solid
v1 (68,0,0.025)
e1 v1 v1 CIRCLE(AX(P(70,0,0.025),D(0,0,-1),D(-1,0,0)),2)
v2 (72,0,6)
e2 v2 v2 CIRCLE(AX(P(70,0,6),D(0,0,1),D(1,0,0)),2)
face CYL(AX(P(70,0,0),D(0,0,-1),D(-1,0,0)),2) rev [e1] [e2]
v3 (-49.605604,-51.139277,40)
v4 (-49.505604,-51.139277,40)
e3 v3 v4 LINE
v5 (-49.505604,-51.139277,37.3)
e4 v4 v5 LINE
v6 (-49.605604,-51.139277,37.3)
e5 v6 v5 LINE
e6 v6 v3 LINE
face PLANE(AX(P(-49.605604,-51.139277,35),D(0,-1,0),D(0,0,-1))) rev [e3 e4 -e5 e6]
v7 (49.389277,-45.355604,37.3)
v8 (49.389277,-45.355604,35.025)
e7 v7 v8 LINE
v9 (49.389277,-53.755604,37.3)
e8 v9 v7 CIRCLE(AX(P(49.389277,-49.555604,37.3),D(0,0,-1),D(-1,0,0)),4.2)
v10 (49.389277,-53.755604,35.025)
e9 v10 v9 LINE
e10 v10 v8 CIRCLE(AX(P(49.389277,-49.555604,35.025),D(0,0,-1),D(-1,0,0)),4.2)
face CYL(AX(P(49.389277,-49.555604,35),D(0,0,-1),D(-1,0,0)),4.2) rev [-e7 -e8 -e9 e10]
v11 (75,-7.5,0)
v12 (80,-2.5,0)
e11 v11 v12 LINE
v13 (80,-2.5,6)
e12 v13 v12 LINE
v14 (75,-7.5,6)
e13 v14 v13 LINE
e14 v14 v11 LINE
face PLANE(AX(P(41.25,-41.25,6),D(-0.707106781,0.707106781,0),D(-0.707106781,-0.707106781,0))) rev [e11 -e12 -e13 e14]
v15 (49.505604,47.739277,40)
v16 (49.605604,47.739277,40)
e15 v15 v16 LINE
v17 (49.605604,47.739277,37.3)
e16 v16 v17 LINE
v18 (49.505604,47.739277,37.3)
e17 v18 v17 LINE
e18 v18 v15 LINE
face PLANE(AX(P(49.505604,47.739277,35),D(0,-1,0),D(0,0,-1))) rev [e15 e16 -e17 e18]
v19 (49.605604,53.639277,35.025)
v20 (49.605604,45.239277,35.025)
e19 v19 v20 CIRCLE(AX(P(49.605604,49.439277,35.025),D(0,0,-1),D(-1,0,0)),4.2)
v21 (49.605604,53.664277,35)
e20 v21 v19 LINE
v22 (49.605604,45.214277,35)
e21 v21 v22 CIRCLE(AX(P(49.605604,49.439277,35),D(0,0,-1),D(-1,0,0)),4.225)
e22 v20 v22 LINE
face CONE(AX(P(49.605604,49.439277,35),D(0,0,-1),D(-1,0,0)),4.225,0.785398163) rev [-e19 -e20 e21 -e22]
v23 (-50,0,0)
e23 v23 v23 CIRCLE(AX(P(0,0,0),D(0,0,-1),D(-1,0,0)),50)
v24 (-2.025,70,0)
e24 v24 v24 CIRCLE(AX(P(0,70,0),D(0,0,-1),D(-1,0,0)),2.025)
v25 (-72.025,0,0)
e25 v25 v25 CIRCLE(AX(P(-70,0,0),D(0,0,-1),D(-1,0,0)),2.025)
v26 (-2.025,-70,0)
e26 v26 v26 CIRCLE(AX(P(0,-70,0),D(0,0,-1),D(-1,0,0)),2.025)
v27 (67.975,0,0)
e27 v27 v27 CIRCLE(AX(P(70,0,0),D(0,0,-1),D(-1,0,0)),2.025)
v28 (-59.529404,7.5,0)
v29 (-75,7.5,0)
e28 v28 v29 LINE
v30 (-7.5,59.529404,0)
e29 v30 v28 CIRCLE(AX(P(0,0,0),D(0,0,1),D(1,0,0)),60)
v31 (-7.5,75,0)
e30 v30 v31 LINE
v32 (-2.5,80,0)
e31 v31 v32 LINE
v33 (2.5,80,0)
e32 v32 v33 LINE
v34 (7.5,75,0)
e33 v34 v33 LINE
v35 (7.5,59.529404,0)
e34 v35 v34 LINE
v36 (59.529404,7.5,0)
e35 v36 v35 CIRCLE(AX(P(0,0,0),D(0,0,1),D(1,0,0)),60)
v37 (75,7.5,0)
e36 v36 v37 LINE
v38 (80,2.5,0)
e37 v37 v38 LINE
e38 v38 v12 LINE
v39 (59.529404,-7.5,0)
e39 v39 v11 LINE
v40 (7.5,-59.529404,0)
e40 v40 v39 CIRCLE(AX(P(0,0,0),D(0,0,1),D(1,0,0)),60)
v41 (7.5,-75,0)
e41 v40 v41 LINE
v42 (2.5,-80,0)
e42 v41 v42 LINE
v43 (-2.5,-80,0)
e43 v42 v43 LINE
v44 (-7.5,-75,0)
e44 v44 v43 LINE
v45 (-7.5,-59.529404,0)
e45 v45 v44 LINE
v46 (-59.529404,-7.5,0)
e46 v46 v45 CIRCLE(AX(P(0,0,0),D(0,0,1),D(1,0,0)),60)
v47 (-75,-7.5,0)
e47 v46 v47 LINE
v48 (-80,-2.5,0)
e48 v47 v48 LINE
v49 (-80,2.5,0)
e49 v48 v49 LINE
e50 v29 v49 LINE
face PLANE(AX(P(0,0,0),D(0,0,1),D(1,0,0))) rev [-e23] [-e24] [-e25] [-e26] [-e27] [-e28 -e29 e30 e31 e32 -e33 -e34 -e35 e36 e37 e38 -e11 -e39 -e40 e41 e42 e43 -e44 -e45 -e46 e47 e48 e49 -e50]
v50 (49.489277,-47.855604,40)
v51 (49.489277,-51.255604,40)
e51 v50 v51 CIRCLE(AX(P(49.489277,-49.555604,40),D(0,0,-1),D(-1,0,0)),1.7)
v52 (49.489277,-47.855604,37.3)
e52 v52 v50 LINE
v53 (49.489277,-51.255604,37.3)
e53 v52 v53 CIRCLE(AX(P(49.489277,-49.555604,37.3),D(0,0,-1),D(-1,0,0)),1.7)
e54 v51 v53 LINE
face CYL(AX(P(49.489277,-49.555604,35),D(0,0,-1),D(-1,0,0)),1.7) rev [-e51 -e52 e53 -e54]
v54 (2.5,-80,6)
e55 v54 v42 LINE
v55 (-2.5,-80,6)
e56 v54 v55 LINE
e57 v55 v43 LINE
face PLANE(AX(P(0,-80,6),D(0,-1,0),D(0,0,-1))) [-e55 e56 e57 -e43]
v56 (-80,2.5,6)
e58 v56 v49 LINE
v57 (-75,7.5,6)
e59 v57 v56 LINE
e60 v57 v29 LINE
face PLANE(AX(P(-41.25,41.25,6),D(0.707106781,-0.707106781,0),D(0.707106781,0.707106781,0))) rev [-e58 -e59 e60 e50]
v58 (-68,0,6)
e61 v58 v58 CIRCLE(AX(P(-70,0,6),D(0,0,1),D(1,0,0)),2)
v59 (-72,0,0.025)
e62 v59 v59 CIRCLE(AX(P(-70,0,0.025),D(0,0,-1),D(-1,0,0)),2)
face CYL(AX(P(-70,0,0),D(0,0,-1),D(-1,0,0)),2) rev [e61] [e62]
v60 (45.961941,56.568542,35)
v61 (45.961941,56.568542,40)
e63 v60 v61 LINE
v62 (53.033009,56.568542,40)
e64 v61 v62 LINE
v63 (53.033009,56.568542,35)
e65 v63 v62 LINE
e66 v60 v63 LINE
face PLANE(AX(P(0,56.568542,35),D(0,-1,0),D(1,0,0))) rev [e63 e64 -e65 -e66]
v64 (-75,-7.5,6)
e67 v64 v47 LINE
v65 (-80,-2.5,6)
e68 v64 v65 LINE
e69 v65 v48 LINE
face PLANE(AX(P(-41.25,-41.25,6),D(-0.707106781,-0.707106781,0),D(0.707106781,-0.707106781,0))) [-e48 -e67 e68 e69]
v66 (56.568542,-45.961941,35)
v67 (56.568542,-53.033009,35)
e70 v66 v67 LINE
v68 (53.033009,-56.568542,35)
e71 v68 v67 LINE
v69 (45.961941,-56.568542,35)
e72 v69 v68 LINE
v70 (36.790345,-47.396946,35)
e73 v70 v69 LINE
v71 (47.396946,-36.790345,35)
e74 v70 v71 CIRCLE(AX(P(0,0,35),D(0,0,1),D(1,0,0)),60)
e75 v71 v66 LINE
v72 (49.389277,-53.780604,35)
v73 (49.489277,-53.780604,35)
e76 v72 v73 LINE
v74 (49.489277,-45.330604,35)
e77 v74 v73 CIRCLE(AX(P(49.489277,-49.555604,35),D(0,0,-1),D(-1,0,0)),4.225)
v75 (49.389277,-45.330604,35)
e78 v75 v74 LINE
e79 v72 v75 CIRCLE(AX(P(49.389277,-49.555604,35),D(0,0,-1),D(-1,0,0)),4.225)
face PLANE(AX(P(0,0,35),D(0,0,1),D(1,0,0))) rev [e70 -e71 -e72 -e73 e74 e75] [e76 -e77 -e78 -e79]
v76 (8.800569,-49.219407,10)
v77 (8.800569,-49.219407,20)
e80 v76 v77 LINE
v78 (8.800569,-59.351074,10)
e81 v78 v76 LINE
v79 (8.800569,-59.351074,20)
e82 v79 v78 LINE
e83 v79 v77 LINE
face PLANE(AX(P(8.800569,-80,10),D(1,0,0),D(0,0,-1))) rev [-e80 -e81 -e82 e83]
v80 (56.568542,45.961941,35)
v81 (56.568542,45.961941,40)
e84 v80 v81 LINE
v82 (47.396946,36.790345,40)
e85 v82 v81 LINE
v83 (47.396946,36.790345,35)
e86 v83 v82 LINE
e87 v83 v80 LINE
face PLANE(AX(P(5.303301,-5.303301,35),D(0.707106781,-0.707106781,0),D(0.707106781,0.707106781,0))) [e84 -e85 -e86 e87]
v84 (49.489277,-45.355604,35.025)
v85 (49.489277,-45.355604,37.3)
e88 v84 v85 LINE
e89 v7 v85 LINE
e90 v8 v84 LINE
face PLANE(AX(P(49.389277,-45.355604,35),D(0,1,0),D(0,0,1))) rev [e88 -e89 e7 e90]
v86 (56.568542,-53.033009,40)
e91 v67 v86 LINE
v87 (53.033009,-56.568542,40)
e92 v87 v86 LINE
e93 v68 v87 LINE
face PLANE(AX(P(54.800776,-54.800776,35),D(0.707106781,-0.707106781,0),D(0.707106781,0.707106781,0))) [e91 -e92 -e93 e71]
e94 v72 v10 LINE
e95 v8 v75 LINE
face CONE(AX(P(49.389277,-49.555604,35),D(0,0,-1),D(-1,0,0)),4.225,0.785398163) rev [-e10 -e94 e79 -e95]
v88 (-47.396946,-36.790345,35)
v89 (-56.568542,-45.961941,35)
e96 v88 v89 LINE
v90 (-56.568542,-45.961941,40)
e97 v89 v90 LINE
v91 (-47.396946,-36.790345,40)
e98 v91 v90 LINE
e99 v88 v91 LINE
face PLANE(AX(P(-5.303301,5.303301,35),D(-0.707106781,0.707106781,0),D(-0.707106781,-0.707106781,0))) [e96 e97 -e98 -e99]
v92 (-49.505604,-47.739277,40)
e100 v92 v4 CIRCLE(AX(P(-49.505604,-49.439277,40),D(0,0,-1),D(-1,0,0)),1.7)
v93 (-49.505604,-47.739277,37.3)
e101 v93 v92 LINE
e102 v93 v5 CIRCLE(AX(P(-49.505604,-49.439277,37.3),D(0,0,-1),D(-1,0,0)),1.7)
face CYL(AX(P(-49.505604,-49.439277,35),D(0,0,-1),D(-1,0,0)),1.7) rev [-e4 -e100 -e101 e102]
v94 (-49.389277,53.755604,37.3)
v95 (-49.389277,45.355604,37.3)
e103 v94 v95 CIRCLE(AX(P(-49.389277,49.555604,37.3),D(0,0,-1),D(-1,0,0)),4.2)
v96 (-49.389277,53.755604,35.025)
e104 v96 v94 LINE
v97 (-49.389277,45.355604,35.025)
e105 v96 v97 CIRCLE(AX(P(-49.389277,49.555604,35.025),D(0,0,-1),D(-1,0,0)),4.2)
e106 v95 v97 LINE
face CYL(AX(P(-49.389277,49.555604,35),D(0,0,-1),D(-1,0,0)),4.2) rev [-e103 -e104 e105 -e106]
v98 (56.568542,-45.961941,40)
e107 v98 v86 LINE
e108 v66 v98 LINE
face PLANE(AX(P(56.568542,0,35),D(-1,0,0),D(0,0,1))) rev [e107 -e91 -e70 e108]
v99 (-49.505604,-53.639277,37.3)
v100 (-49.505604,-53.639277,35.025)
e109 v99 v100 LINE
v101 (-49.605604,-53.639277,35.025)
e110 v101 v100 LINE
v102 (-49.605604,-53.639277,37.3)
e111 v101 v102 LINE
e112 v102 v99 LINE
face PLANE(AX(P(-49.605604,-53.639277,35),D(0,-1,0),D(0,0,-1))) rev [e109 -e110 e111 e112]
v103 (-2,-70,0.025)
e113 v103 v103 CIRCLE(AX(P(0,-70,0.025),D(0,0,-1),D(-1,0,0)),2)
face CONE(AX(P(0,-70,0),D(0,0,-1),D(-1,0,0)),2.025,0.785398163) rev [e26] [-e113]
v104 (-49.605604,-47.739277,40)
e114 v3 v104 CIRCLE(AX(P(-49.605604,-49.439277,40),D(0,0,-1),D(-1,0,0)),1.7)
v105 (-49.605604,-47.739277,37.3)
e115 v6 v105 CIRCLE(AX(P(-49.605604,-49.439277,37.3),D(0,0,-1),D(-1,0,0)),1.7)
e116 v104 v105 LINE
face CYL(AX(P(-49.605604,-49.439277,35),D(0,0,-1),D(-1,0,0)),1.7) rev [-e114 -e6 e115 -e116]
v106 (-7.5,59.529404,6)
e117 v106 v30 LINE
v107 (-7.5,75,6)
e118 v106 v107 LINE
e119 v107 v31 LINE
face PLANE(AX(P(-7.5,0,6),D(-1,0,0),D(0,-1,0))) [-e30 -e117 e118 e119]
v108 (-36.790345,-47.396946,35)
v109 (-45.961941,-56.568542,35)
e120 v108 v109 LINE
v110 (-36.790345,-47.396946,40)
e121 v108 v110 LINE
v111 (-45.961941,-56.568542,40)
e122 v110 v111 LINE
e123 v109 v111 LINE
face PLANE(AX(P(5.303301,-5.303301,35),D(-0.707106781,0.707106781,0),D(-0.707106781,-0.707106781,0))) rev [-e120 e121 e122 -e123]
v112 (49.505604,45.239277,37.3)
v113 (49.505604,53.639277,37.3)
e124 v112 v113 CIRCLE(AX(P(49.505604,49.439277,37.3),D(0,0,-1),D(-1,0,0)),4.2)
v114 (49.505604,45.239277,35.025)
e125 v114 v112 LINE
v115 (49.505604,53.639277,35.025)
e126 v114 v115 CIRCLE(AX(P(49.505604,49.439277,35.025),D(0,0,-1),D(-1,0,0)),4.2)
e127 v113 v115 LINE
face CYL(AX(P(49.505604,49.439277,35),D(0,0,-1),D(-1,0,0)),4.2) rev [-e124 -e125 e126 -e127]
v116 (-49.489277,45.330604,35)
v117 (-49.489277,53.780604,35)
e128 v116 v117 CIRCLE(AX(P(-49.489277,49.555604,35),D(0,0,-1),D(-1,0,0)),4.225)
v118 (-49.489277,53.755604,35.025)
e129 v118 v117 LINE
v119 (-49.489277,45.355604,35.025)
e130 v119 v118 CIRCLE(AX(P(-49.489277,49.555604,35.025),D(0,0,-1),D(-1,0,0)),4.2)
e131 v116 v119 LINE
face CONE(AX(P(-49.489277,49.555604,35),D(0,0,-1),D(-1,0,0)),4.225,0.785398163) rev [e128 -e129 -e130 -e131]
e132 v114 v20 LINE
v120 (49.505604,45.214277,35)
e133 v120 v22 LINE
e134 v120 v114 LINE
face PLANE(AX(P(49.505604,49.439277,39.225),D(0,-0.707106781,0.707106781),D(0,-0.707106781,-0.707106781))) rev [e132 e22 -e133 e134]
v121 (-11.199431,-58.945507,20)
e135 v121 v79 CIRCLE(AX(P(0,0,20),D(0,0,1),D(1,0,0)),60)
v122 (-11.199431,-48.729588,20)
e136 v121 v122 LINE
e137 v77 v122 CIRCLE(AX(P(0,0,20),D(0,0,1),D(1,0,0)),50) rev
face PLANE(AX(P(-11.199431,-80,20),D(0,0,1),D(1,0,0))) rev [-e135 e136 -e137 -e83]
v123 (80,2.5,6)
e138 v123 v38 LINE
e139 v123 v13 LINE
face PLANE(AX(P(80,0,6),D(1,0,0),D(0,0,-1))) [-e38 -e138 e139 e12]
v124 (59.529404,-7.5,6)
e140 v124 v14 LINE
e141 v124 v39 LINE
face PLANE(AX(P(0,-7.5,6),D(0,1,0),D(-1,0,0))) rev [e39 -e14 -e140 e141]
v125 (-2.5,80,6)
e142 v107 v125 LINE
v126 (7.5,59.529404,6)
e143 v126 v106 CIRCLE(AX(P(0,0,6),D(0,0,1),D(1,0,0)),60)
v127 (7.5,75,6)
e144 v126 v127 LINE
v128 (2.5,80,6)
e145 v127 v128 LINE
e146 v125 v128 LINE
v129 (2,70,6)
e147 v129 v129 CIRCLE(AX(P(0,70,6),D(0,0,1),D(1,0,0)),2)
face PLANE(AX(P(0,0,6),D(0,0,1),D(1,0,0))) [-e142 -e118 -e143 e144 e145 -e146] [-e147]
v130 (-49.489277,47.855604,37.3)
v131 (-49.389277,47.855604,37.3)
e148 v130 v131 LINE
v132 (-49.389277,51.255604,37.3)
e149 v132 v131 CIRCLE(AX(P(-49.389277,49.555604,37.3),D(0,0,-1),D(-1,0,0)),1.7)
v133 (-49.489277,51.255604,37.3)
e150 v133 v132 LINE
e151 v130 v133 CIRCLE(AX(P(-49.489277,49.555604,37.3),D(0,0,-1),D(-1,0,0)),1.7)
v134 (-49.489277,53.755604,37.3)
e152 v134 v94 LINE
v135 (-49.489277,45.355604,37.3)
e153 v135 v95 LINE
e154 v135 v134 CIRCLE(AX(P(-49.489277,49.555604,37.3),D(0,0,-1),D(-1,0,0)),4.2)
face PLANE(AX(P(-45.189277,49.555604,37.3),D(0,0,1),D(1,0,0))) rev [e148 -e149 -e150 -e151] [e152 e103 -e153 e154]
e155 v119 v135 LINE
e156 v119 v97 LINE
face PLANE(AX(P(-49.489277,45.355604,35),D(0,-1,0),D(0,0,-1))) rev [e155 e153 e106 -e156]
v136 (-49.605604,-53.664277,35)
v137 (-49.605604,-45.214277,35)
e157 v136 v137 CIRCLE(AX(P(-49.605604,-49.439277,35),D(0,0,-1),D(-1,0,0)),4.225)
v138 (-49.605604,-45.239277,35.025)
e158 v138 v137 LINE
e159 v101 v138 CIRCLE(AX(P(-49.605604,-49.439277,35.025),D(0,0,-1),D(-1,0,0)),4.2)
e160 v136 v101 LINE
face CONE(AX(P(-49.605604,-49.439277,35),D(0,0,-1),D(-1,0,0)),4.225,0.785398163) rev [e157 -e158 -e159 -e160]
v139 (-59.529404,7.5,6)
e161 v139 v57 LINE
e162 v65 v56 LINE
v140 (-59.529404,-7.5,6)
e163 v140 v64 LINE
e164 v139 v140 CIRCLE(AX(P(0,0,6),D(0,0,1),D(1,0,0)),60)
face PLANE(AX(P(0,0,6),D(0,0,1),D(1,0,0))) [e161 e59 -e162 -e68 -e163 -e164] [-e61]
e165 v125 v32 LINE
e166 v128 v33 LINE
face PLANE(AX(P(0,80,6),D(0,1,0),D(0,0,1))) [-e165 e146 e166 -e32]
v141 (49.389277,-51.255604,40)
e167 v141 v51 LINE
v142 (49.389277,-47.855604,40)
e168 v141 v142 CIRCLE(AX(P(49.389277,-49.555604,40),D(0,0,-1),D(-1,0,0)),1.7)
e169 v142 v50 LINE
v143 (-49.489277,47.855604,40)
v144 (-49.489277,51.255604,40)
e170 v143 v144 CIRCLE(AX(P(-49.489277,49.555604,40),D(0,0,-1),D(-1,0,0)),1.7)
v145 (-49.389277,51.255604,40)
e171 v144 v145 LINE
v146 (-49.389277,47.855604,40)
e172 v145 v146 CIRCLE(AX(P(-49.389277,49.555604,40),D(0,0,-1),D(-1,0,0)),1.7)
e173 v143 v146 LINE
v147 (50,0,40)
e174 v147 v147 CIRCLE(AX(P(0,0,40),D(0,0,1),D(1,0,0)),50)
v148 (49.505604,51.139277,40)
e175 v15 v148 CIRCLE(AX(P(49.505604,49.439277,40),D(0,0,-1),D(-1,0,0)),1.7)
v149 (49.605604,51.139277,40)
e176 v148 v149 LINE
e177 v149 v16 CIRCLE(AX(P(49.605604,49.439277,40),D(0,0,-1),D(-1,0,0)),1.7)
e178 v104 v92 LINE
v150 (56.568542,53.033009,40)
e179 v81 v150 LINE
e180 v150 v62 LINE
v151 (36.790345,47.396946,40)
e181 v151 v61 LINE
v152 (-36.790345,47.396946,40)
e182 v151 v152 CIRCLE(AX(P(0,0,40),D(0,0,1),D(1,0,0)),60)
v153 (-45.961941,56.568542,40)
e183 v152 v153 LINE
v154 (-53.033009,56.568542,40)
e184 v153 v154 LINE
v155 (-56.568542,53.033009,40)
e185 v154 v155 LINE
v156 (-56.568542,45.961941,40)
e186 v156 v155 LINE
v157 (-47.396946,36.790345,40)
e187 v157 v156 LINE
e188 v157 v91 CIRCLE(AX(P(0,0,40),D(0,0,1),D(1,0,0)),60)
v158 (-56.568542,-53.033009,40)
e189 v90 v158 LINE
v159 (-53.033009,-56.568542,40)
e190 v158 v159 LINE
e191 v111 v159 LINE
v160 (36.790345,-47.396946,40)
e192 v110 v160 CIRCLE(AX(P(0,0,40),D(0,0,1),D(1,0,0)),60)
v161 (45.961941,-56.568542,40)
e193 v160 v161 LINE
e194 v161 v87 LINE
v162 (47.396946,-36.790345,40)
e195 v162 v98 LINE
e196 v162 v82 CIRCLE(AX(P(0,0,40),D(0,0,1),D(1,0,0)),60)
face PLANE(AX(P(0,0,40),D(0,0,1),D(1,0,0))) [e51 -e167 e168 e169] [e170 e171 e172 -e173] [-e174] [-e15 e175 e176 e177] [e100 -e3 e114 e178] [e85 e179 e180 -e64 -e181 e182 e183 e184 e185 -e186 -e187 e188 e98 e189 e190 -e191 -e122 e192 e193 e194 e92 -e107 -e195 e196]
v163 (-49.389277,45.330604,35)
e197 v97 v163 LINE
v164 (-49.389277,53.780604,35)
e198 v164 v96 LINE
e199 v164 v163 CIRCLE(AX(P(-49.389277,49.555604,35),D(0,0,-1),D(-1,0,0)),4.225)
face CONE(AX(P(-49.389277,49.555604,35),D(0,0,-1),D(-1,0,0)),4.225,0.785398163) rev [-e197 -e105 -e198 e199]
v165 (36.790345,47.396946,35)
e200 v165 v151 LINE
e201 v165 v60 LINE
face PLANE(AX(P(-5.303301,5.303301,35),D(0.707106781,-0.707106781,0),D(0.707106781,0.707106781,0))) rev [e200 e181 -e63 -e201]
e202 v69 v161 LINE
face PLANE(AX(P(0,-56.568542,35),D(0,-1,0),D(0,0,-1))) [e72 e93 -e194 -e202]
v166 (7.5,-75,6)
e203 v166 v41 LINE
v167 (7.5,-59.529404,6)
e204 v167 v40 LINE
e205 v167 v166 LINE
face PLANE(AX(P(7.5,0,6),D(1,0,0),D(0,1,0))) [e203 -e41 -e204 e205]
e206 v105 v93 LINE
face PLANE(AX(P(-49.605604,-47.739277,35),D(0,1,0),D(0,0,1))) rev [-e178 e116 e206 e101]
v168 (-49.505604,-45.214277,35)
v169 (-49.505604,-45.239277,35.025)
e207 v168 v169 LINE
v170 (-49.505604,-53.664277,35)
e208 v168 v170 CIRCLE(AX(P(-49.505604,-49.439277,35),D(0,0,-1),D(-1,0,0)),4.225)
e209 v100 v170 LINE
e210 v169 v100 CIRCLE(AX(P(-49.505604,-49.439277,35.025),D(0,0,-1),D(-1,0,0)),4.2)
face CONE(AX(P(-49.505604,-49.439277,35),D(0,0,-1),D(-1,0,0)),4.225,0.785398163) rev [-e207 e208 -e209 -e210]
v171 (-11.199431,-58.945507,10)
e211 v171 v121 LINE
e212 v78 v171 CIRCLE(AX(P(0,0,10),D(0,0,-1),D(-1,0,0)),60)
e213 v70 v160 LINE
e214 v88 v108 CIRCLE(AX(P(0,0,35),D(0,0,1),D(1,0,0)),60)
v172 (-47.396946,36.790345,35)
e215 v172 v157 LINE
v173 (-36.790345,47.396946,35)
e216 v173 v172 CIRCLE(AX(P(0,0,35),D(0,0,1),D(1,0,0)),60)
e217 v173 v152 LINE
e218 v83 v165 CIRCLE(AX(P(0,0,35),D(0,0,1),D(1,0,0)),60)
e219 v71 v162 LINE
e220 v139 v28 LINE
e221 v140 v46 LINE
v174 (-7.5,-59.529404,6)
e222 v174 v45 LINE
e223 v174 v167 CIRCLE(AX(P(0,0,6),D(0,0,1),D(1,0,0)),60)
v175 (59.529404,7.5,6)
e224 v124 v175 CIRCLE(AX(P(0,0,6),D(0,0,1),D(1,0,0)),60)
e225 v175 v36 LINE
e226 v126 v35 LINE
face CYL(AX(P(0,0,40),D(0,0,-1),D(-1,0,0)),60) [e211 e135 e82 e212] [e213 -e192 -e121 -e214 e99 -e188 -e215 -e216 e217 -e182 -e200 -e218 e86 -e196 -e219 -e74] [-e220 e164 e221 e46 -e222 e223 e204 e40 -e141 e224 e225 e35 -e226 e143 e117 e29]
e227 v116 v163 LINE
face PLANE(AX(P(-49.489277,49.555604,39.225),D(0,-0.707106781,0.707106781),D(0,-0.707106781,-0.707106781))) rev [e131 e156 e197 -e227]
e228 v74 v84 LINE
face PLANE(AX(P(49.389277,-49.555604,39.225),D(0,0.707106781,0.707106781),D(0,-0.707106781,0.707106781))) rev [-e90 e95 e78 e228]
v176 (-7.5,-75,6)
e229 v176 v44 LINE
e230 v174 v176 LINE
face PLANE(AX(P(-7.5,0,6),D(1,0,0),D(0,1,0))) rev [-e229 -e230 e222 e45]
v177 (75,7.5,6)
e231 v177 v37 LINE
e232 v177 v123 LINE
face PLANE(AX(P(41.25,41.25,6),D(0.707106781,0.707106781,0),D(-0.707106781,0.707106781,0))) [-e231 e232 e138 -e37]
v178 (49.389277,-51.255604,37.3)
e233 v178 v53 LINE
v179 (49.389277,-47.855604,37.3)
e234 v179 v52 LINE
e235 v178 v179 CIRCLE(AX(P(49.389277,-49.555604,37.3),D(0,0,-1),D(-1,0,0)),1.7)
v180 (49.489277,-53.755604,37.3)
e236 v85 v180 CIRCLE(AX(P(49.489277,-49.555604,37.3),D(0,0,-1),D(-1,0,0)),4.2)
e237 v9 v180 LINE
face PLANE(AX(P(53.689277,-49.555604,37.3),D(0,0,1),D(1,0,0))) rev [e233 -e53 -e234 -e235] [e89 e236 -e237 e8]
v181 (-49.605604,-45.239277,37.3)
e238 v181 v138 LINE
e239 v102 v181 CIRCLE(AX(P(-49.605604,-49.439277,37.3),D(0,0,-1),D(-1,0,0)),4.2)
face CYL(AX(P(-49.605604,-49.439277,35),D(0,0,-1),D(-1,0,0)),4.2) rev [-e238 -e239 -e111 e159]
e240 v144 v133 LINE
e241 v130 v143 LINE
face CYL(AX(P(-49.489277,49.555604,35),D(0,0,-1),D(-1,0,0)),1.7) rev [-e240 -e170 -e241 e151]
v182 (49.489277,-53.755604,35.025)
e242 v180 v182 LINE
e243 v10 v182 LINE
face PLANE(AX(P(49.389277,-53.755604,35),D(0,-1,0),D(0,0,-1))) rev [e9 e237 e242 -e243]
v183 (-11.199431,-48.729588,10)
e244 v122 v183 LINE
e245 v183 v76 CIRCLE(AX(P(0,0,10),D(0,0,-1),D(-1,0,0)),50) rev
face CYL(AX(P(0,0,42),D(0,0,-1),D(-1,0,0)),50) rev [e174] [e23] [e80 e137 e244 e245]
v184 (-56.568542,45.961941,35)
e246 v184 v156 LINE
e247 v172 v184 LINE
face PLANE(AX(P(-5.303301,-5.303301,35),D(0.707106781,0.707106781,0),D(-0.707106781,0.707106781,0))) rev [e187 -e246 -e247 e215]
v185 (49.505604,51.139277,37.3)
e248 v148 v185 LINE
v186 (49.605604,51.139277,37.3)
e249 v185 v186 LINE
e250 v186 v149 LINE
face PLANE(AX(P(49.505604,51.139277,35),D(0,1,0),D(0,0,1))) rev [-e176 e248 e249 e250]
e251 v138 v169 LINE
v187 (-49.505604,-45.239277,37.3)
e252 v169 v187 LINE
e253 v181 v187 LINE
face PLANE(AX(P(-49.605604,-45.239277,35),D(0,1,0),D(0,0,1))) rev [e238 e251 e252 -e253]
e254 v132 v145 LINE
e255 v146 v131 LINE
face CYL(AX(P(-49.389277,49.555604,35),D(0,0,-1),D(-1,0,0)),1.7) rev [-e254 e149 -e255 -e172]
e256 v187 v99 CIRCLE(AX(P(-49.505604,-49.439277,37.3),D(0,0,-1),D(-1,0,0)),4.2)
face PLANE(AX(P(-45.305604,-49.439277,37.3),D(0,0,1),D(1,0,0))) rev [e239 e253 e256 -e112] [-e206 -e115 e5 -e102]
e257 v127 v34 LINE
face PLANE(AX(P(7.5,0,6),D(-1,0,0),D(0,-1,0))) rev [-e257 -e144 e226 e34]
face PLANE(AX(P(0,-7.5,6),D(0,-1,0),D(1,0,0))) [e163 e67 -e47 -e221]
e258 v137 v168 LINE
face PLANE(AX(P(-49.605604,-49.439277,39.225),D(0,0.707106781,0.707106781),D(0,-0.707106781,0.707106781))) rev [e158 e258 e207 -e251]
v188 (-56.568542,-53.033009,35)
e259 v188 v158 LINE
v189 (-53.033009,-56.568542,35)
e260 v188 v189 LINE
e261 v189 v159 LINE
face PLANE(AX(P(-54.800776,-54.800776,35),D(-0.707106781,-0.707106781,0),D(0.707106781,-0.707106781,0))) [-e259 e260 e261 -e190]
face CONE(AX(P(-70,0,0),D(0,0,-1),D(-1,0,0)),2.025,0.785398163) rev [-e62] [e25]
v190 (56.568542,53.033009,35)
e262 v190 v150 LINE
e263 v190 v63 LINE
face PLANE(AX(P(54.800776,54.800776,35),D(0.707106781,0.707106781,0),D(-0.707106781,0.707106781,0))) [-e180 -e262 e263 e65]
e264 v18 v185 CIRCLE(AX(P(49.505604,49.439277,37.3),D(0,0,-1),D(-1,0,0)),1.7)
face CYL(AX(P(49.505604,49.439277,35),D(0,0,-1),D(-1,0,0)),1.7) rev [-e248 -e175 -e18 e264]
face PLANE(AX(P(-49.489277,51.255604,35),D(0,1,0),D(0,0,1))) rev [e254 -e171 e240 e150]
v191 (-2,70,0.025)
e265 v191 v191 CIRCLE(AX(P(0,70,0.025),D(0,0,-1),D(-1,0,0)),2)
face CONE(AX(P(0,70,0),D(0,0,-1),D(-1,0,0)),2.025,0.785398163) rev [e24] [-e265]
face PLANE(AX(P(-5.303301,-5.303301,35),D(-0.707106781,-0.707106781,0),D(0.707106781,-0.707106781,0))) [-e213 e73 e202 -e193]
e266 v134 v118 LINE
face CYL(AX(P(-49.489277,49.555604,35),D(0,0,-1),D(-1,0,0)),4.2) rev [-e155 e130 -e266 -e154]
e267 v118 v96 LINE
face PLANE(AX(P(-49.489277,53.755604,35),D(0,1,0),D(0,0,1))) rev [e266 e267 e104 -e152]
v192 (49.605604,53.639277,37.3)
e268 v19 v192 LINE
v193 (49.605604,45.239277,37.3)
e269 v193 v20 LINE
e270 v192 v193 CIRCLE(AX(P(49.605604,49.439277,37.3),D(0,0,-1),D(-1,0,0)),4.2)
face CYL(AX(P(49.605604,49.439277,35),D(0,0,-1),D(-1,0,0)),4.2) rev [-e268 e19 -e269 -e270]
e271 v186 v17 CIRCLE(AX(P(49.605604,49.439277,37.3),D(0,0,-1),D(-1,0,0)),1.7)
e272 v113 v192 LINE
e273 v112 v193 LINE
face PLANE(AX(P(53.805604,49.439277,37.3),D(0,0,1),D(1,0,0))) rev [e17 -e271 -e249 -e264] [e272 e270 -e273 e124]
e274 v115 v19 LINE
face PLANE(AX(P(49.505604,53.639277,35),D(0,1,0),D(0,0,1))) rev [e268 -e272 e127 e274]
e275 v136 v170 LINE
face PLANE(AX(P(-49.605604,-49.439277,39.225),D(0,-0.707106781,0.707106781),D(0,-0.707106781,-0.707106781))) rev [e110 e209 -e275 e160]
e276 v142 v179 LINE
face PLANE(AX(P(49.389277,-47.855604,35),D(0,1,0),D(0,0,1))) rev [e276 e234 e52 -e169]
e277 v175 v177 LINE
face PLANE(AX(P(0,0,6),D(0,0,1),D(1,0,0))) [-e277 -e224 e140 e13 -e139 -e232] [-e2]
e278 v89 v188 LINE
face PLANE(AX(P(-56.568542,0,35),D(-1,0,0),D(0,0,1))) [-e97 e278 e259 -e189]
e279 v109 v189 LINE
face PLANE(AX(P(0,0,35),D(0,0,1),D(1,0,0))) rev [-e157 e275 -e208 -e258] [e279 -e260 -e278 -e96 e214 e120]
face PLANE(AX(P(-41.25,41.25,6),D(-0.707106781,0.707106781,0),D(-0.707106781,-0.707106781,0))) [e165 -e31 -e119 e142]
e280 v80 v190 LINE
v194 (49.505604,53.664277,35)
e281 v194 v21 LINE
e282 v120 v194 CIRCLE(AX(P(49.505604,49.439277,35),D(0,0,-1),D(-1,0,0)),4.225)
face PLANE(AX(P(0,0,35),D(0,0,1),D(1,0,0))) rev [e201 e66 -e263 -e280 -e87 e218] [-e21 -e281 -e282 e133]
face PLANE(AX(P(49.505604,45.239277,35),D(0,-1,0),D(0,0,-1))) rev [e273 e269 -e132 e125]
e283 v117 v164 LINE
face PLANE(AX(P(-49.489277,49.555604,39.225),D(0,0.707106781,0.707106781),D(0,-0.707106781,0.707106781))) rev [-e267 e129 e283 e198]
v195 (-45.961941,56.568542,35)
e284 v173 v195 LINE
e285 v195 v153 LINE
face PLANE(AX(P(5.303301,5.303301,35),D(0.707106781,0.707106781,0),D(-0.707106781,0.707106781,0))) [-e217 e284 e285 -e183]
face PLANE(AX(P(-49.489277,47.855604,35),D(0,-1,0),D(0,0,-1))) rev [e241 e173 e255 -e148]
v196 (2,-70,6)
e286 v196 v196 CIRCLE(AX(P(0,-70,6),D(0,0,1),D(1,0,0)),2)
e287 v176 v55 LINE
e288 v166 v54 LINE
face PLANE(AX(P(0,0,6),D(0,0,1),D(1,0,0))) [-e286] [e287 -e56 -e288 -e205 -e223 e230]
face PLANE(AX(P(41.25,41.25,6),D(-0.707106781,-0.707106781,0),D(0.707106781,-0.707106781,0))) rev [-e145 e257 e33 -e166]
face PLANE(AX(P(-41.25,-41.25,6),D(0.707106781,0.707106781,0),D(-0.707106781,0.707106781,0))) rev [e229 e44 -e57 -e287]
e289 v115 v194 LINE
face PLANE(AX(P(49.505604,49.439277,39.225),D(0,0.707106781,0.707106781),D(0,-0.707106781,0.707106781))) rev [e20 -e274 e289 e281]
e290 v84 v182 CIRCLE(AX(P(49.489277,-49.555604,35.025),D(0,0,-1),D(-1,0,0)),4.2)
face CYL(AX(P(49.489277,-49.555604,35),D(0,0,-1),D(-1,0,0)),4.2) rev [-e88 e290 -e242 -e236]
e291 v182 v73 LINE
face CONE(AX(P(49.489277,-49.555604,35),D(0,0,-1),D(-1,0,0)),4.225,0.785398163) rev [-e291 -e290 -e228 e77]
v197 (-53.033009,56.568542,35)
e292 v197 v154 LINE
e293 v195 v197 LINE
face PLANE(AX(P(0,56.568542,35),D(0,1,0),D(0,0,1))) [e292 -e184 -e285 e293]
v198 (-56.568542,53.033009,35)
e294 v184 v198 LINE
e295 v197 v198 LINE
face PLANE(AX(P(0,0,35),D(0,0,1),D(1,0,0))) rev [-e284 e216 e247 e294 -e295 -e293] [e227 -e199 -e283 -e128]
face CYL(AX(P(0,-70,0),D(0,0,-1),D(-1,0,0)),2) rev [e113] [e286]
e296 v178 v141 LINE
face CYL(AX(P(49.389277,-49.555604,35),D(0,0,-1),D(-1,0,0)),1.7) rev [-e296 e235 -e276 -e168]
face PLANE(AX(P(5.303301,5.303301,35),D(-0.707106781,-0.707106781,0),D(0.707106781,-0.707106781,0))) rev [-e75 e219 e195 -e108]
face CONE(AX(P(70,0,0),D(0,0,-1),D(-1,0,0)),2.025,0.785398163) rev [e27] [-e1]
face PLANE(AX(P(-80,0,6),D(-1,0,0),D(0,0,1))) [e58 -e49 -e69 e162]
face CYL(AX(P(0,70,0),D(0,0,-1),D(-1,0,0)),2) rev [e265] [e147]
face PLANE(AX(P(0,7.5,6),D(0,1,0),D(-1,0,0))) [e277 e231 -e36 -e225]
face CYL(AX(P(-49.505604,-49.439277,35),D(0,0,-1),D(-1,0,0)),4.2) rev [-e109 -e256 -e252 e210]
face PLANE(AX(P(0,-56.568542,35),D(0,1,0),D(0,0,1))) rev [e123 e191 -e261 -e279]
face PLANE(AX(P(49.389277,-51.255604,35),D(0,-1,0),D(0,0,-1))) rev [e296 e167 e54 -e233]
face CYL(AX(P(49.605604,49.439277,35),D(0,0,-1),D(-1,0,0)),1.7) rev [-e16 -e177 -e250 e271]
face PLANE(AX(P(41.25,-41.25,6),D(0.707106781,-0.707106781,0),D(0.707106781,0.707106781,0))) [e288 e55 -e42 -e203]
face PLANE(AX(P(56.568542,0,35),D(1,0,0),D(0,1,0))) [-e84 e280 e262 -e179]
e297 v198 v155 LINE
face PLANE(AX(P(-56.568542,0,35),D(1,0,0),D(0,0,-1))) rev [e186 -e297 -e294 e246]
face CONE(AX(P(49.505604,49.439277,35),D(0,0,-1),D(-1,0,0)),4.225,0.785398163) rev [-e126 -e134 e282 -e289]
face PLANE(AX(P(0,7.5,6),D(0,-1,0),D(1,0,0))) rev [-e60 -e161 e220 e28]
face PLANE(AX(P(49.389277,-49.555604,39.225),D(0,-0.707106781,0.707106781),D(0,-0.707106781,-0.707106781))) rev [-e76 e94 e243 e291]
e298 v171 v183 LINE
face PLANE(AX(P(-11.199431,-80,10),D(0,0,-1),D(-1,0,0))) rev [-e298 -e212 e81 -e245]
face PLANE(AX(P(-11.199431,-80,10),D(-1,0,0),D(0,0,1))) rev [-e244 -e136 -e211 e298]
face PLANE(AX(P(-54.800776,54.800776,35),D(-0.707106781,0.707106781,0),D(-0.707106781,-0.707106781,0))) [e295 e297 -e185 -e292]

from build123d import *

# Parameters (mm, degrees)
SKETCH1_R                                      = 60
BOSS_EXTRUDE1_DEPTH                            = 40
BOSS_EXTRUDE2_DEPTH                            = 6
SKETCH2_R                                      = 50
CUT_EXTRUDE1_DEPTH                             = 42
BOSS_EXTRUDE4_START                            = -5
BOSS_EXTRUDE4_DEPTH                            = 5
CBORE_START                                    = 35
CBORE_SLOT_FOR_M3_HEX_HEAD_MACHINE_SCREW_DEPTH = 2.3
CBORE_START_2                                  = 37.3
CBORE_SLOT_FOR_M3_HEX_HEAD_MACHINE_S_3_DEPTH   = 2.7
F_4_0MM_DOWEL_HOLE1_D                          = 4
F_4_0MM_DOWEL_HOLE1_CSINK_D                    = 4.05
F_4_0MM_DOWEL_HOLE1_CSINK_ANGLE                = 90
SKETCH33_W                                     = 20
SKETCH33_H                                     = 10
CUT_EXTRUDE3_DEPTH                             = 121


with BuildPart() as part:
    # Sketch1 → Boss-Extrude1 (new body)
    with BuildSketch(Plane.XY):
        Circle(SKETCH1_R)
    extrude(amount=BOSS_EXTRUDE1_DEPTH)

    # Sketch1<6> → Boss-Extrude2 (add)
    with BuildSketch(Plane.XY):
        with BuildLine():
            Line((-7.5, 75), (-7.5, 59.529404499))
            ThreePointArc((-7.5, 59.529404499), (0, 60), (7.5, 59.529404499))
            Line((7.5, 59.529404499), (7.5, 75))
            Line((7.5, 75), (2.5, 80))
            Line((2.5, 80), (-2.5, 80))
            Line((-2.5, 80), (-7.5, 75))
        make_face()
        with BuildLine():
            Line((-59.529404499, 7.5), (-75, 7.5))
            Line((-75, 7.5), (-80, 2.5))
            Line((-80, 2.5), (-80, -2.5))
            Line((-80, -2.5), (-75, -7.5))
            Line((-75, -7.5), (-59.529404499, -7.5))
            ThreePointArc((-59.529404499, -7.5), (-60, 0), (-59.529404499, 7.5))
        make_face()
        with BuildLine():
            ThreePointArc((7.5, -59.529404499), (0, -60), (-7.5, -59.529404499))
            Line((-7.5, -59.529404499), (-7.5, -75))
            Line((-7.5, -75), (-2.5, -80))
            Line((-2.5, -80), (2.5, -80))
            Line((2.5, -80), (7.5, -75))
            Line((7.5, -75), (7.5, -59.529404499))
        make_face()
        with BuildLine():
            Line((75, 7.5), (59.529404499, 7.5))
            ThreePointArc((59.529404499, 7.5), (59.882235554, 3.757374753), (60, 0))
            ThreePointArc((60, 0), (59.882235554, -3.757374753), (59.529404499, -7.5))
            Line((59.529404499, -7.5), (75, -7.5))
            Line((75, -7.5), (80, -2.5))
            Line((80, -2.5), (80, 2.5))
            Line((80, 2.5), (75, 7.5))
        make_face()
    extrude(amount=BOSS_EXTRUDE2_DEPTH)

    # Sketch2 → Cut-Extrude1 (cut)
    with BuildSketch(Plane(origin=(0, 0, 0), x_dir=(-1, 0, 0), z_dir=(0, 0, -1))):
        Circle(SKETCH2_R)
    extrude(amount=-CUT_EXTRUDE1_DEPTH, mode=Mode.SUBTRACT)

    # Sketch4 → Boss-Extrude4 (add)
    with BuildSketch(Plane.XY.offset(40).offset(BOSS_EXTRUDE4_START)):
        with BuildLine():
            Line((53.033008589, 56.568542495), (45.961940777, 56.568542495))
            Line((45.961940777, 56.568542495), (36.790344742, 47.39694646))
            ThreePointArc((36.790344742, 47.39694646), (42.426406871, 42.426406871), (47.39694646, 36.790344742))
            Line((47.39694646, 36.790344742), (56.568542495, 45.961940777))
            Line((56.568542495, 45.961940777), (56.568542495, 53.033008589))
            Line((56.568542495, 53.033008589), (53.033008589, 56.568542495))
        make_face()
        with BuildLine():
            ThreePointArc((-47.39694646, 36.790344742), (-42.426406871, 42.426406871), (-36.790344742, 47.39694646))
            Line((-36.790344742, 47.39694646), (-45.961940777, 56.568542495))
            Line((-45.961940777, 56.568542495), (-53.033008589, 56.568542495))
            Line((-53.033008589, 56.568542495), (-56.568542495, 53.033008589))
            Line((-56.568542495, 53.033008589), (-56.568542495, 45.961940777))
            Line((-56.568542495, 45.961940777), (-47.39694646, 36.790344742))
        make_face()
        with BuildLine():
            Line((56.568542495, -45.961940777), (47.39694646, -36.790344742))
            ThreePointArc((47.39694646, -36.790344742), (42.426406871, -42.426406871), (36.790344742, -47.39694646))
            Line((36.790344742, -47.39694646), (45.961940777, -56.568542495))
            Line((45.961940777, -56.568542495), (53.033008589, -56.568542495))
            Line((53.033008589, -56.568542495), (56.568542495, -53.033008589))
            Line((56.568542495, -53.033008589), (56.568542495, -45.961940777))
        make_face()
        with BuildLine():
            ThreePointArc((-36.790344742, -47.39694646), (-42.426406871, -42.426406871), (-47.39694646, -36.790344742))
            Line((-47.39694646, -36.790344742), (-56.568542495, -45.961940777))
            Line((-56.568542495, -45.961940777), (-56.568542495, -53.033008589))
            Line((-56.568542495, -53.033008589), (-53.033008589, -56.568542495))
            Line((-53.033008589, -56.568542495), (-45.961940777, -56.568542495))
            Line((-45.961940777, -56.568542495), (-36.790344742, -47.39694646))
        make_face()
    extrude(amount=BOSS_EXTRUDE4_DEPTH)

    # CBORE SLOT for M3 Hex Head Machine Screw6: read off the stored shape, not the designer's step
    # CBORE SLOT for M3 Hex Head Machine S 2 → CBORE SLOT for M3 Hex Head Machine Screw6 (cut)
    with BuildSketch(Plane.XY.offset(CBORE_START)):
        with BuildLine():
            ThreePointArc((49.489276654, -53.755604364), (53.689276654, -49.555604364), (49.489276654, -45.355604364))
            Line((49.489276654, -45.355604364), (49.389276654, -45.355604364))
            ThreePointArc((49.389276654, -45.355604364), (45.189276654, -49.555604364), (49.389276654, -53.755604364))
            Line((49.389276654, -53.755604364), (49.489276654, -53.755604364))
        make_face()
        with BuildLine():
            ThreePointArc((-49.505604364, -53.639276654), (-45.305604364, -49.439276654), (-49.505604364, -45.239276654))
            Line((-49.505604364, -45.239276654), (-49.605604364, -45.239276654))
            ThreePointArc((-49.605604364, -45.239276654), (-53.805604364, -49.439276654), (-49.605604364, -53.639276654))
            Line((-49.605604364, -53.639276654), (-49.505604364, -53.639276654))
        make_face()
        with BuildLine():
            ThreePointArc((-49.389276654, 45.355604364), (-45.189276654, 49.555604364), (-49.389276654, 53.755604364))
            Line((-49.389276654, 53.755604364), (-49.489276654, 53.755604364))
            ThreePointArc((-49.489276654, 53.755604364), (-53.689276654, 49.555604364), (-49.489276654, 45.355604364))
            Line((-49.489276654, 45.355604364), (-49.389276654, 45.355604364))
        make_face()
        with BuildLine():
            ThreePointArc((49.605604364, 45.239276654), (53.805604364, 49.439276654), (49.605604364, 53.639276654))
            Line((49.605604364, 53.639276654), (49.505604364, 53.639276654))
            ThreePointArc((49.505604364, 53.639276654), (45.305604364, 49.439276654), (49.505604364, 45.239276654))
            Line((49.505604364, 45.239276654), (49.605604364, 45.239276654))
        make_face()
    extrude(amount=CBORE_SLOT_FOR_M3_HEX_HEAD_MACHINE_SCREW_DEPTH, mode=Mode.SUBTRACT)

    # CBORE SLOT for M3 Hex Head Machine S 3 o → CBORE SLOT for M3 Hex Head Machine S 3 (cut)
    with BuildSketch(Plane.XY.offset(CBORE_START_2)):
        with BuildLine():
            ThreePointArc((49.489276654, -51.255604364), (51.189276654, -49.555604364), (49.489276654, -47.855604364))
            Line((49.489276654, -47.855604364), (49.389276654, -47.855604364))
            ThreePointArc((49.389276654, -47.855604364), (47.689276654, -49.555604364), (49.389276654, -51.255604364))
            Line((49.389276654, -51.255604364), (49.489276654, -51.255604364))
        make_face()
        with BuildLine():
            ThreePointArc((-49.505604364, -51.139276654), (-47.805604364, -49.439276654), (-49.505604364, -47.739276654))
            Line((-49.505604364, -47.739276654), (-49.605604364, -47.739276654))
            ThreePointArc((-49.605604364, -47.739276654), (-51.305604364, -49.439276654), (-49.605604364, -51.139276654))
            Line((-49.605604364, -51.139276654), (-49.505604364, -51.139276654))
        make_face()
        with BuildLine():
            ThreePointArc((-49.389276654, 47.855604364), (-47.689276654, 49.555604364), (-49.389276654, 51.255604364))
            Line((-49.389276654, 51.255604364), (-49.489276654, 51.255604364))
            ThreePointArc((-49.489276654, 51.255604364), (-51.189276654, 49.555604364), (-49.489276654, 47.855604364))
            Line((-49.489276654, 47.855604364), (-49.389276654, 47.855604364))
        make_face()
        with BuildLine():
            ThreePointArc((49.605604364, 47.739276654), (51.305604364, 49.439276654), (49.605604364, 51.139276654))
            Line((49.605604364, 51.139276654), (49.505604364, 51.139276654))
            ThreePointArc((49.505604364, 51.139276654), (47.805604364, 49.439276654), (49.505604364, 47.739276654))
            Line((49.505604364, 47.739276654), (49.605604364, 47.739276654))
        make_face()
    extrude(amount=CBORE_SLOT_FOR_M3_HEX_HEAD_MACHINE_S_3_DEPTH, mode=Mode.SUBTRACT)

    # CBORE SLOT for M3 Hex Head Machine S 4: loft between two sections, ruled curve by curve
    cbore_slot_for_m3_hex_head_machine_s_4_from = [
        Edge.make_three_point_arc((49.489276654, -45.355604364, 35.025), (52.459125135, -46.585755883, 35.025), (53.689276654, -49.555604364, 35.025)),
        Edge.make_three_point_arc((53.689276654, -49.555604364, 35.025), (52.459125135, -52.525452845, 35.025), (49.489276654, -53.755604364, 35.025)),
        Edge.make_three_point_arc((49.389276654, -53.755604364, 35.025), (46.419428173, -52.525452845, 35.025), (45.189276654, -49.555604364, 35.025)),
        Edge.make_three_point_arc((45.189276654, -49.555604364, 35.025), (46.419428173, -46.585755883, 35.025), (49.389276654, -45.355604364, 35.025)),
        Edge.make_line((49.489276654, -53.755604364, 35.025), (49.389276654, -53.755604364, 35.025)),
        Edge.make_line((49.489276654, -45.355604364, 35.025), (49.389276654, -45.355604364, 35.025)),
    ]
    cbore_slot_for_m3_hex_head_machine_s_4_to = [
        Edge.make_three_point_arc((49.489276654, -45.330604364, 35), (52.476802805, -46.568078214, 35), (53.714276654, -49.555604364, 35)),
        Edge.make_three_point_arc((53.714276654, -49.555604364, 35), (52.476802805, -52.543130515, 35), (49.489276654, -53.780604364, 35)),
        Edge.make_three_point_arc((49.389276654, -53.780604364, 35), (46.401750504, -52.543130515, 35), (45.164276654, -49.555604364, 35)),
        Edge.make_three_point_arc((45.164276654, -49.555604364, 35), (46.401750504, -46.568078214, 35), (49.389276654, -45.330604364, 35)),
        Edge.make_line((49.489276654, -53.780604364, 35), (49.389276654, -53.780604364, 35)),
        Edge.make_line((49.489276654, -45.330604364, 35), (49.389276654, -45.330604364, 35)),
    ]
    cbore_slot_for_m3_hex_head_machine_s_4 = Solid(Shell([*[Face.make_surface_from_curves(cbore_slot_for_m3_hex_head_machine_s_4_from[k], cbore_slot_for_m3_hex_head_machine_s_4_to[k]) for k in range(6)], Face(Wire(cbore_slot_for_m3_hex_head_machine_s_4_from)), Face(Wire(cbore_slot_for_m3_hex_head_machine_s_4_to))]))
    add(cbore_slot_for_m3_hex_head_machine_s_4, mode=Mode.SUBTRACT)

    # CBORE SLOT for M3 Hex Head Machine S 5: loft between two sections, ruled curve by curve
    cbore_slot_for_m3_hex_head_machine_s_5_from = [
        Edge.make_three_point_arc((-49.505604364, -45.239276654, 35.025), (-46.535755883, -46.469428173, 35.025), (-45.305604364, -49.439276654, 35.025)),
        Edge.make_three_point_arc((-45.305604364, -49.439276654, 35.025), (-46.535755883, -52.409125135, 35.025), (-49.505604364, -53.639276654, 35.025)),
        Edge.make_three_point_arc((-49.605604364, -53.639276654, 35.025), (-52.575452845, -52.409125135, 35.025), (-53.805604364, -49.439276654, 35.025)),
        Edge.make_three_point_arc((-53.805604364, -49.439276654, 35.025), (-52.575452845, -46.469428173, 35.025), (-49.605604364, -45.239276654, 35.025)),
        Edge.make_line((-49.505604364, -53.639276654, 35.025), (-49.605604364, -53.639276654, 35.025)),
        Edge.make_line((-49.505604364, -45.239276654, 35.025), (-49.605604364, -45.239276654, 35.025)),
    ]
    cbore_slot_for_m3_hex_head_machine_s_5_to = [
        Edge.make_three_point_arc((-49.505604364, -45.214276654, 35), (-46.518078214, -46.451750504, 35), (-45.280604364, -49.439276654, 35)),
        Edge.make_three_point_arc((-45.280604364, -49.439276654, 35), (-46.518078214, -52.426802805, 35), (-49.505604364, -53.664276654, 35)),
        Edge.make_three_point_arc((-49.605604364, -53.664276654, 35), (-52.593130515, -52.426802805, 35), (-53.830604364, -49.439276654, 35)),
        Edge.make_three_point_arc((-53.830604364, -49.439276654, 35), (-52.593130515, -46.451750504, 35), (-49.605604364, -45.214276654, 35)),
        Edge.make_line((-49.505604364, -53.664276654, 35), (-49.605604364, -53.664276654, 35)),
        Edge.make_line((-49.505604364, -45.214276654, 35), (-49.605604364, -45.214276654, 35)),
    ]
    cbore_slot_for_m3_hex_head_machine_s_5 = Solid(Shell([*[Face.make_surface_from_curves(cbore_slot_for_m3_hex_head_machine_s_5_from[k], cbore_slot_for_m3_hex_head_machine_s_5_to[k]) for k in range(6)], Face(Wire(cbore_slot_for_m3_hex_head_machine_s_5_from)), Face(Wire(cbore_slot_for_m3_hex_head_machine_s_5_to))]))
    add(cbore_slot_for_m3_hex_head_machine_s_5, mode=Mode.SUBTRACT)

    # CBORE SLOT for M3 Hex Head Machine S 6: loft between two sections, ruled curve by curve
    cbore_slot_for_m3_hex_head_machine_s_6_from = [
        Edge.make_three_point_arc((-49.389276654, 53.755604364, 35.025), (-46.419428173, 52.525452845, 35.025), (-45.189276654, 49.555604364, 35.025)),
        Edge.make_three_point_arc((-45.189276654, 49.555604364, 35.025), (-46.419428173, 46.585755883, 35.025), (-49.389276654, 45.355604364, 35.025)),
        Edge.make_three_point_arc((-49.489276654, 45.355604364, 35.025), (-52.459125135, 46.585755883, 35.025), (-53.689276654, 49.555604364, 35.025)),
        Edge.make_three_point_arc((-53.689276654, 49.555604364, 35.025), (-52.459125135, 52.525452845, 35.025), (-49.489276654, 53.755604364, 35.025)),
        Edge.make_line((-49.389276654, 45.355604364, 35.025), (-49.489276654, 45.355604364, 35.025)),
        Edge.make_line((-49.389276654, 53.755604364, 35.025), (-49.489276654, 53.755604364, 35.025)),
    ]
    cbore_slot_for_m3_hex_head_machine_s_6_to = [
        Edge.make_three_point_arc((-49.389276654, 53.780604364, 35), (-46.401750504, 52.543130515, 35), (-45.164276654, 49.555604364, 35)),
        Edge.make_three_point_arc((-45.164276654, 49.555604364, 35), (-46.401750504, 46.568078214, 35), (-49.389276654, 45.330604364, 35)),
        Edge.make_three_point_arc((-49.489276654, 45.330604364, 35), (-52.476802805, 46.568078214, 35), (-53.714276654, 49.555604364, 35)),
        Edge.make_three_point_arc((-53.714276654, 49.555604364, 35), (-52.476802805, 52.543130515, 35), (-49.489276654, 53.780604364, 35)),
        Edge.make_line((-49.389276654, 45.330604364, 35), (-49.489276654, 45.330604364, 35)),
        Edge.make_line((-49.389276654, 53.780604364, 35), (-49.489276654, 53.780604364, 35)),
    ]
    cbore_slot_for_m3_hex_head_machine_s_6 = Solid(Shell([*[Face.make_surface_from_curves(cbore_slot_for_m3_hex_head_machine_s_6_from[k], cbore_slot_for_m3_hex_head_machine_s_6_to[k]) for k in range(6)], Face(Wire(cbore_slot_for_m3_hex_head_machine_s_6_from)), Face(Wire(cbore_slot_for_m3_hex_head_machine_s_6_to))]))
    add(cbore_slot_for_m3_hex_head_machine_s_6, mode=Mode.SUBTRACT)

    # CBORE SLOT for M3 Hex Head Machine S 7: loft between two sections, ruled curve by curve
    cbore_slot_for_m3_hex_head_machine_s_7_from = [
        Edge.make_three_point_arc((49.605604364, 53.639276654, 35.025), (52.575452845, 52.409125135, 35.025), (53.805604364, 49.439276654, 35.025)),
        Edge.make_three_point_arc((53.805604364, 49.439276654, 35.025), (52.575452845, 46.469428173, 35.025), (49.605604364, 45.239276654, 35.025)),
        Edge.make_three_point_arc((49.505604364, 45.239276654, 35.025), (46.535755883, 46.469428173, 35.025), (45.305604364, 49.439276654, 35.025)),
        Edge.make_three_point_arc((45.305604364, 49.439276654, 35.025), (46.535755883, 52.409125135, 35.025), (49.505604364, 53.639276654, 35.025)),
        Edge.make_line((49.605604364, 45.239276654, 35.025), (49.505604364, 45.239276654, 35.025)),
        Edge.make_line((49.605604364, 53.639276654, 35.025), (49.505604364, 53.639276654, 35.025)),
    ]
    cbore_slot_for_m3_hex_head_machine_s_7_to = [
        Edge.make_three_point_arc((49.605604364, 53.664276654, 35), (52.593130515, 52.426802805, 35), (53.830604364, 49.439276654, 35)),
        Edge.make_three_point_arc((53.830604364, 49.439276654, 35), (52.593130515, 46.451750504, 35), (49.605604364, 45.214276654, 35)),
        Edge.make_three_point_arc((49.505604364, 45.214276654, 35), (46.518078214, 46.451750504, 35), (45.280604364, 49.439276654, 35)),
        Edge.make_three_point_arc((45.280604364, 49.439276654, 35), (46.518078214, 52.426802805, 35), (49.505604364, 53.664276654, 35)),
        Edge.make_line((49.605604364, 45.214276654, 35), (49.505604364, 45.214276654, 35)),
        Edge.make_line((49.605604364, 53.664276654, 35), (49.505604364, 53.664276654, 35)),
    ]
    cbore_slot_for_m3_hex_head_machine_s_7 = Solid(Shell([*[Face.make_surface_from_curves(cbore_slot_for_m3_hex_head_machine_s_7_from[k], cbore_slot_for_m3_hex_head_machine_s_7_to[k]) for k in range(6)], Face(Wire(cbore_slot_for_m3_hex_head_machine_s_7_from)), Face(Wire(cbore_slot_for_m3_hex_head_machine_s_7_to))]))
    add(cbore_slot_for_m3_hex_head_machine_s_7, mode=Mode.SUBTRACT)

    # Ø4.0mm Dowel Hole1 (through all)
    with Locations(Plane(origin=(0, 0, 0), x_dir=(-1, 0, 0), z_dir=(0, 0, -1))):
        with Locations((0, 70), (70, 0), (0, -70), (-70, 0)):
            CounterSinkHole(F_4_0MM_DOWEL_HOLE1_D / 2, F_4_0MM_DOWEL_HOLE1_CSINK_D / 2, counter_sink_angle=F_4_0MM_DOWEL_HOLE1_CSINK_ANGLE)

    # Sketch33 → Cut-Extrude3 (cut, through all)
    with BuildSketch(Plane(origin=(0, 0, 0), x_dir=(1, 0, 0), z_dir=(0, 1, 0))):
        with Locations((-1.199431059, -15)):
            Rectangle(SKETCH33_W, SKETCH33_H)
    extrude(amount=-CUT_EXTRUDE3_DEPTH, mode=Mode.SUBTRACT)


solid = part.part
